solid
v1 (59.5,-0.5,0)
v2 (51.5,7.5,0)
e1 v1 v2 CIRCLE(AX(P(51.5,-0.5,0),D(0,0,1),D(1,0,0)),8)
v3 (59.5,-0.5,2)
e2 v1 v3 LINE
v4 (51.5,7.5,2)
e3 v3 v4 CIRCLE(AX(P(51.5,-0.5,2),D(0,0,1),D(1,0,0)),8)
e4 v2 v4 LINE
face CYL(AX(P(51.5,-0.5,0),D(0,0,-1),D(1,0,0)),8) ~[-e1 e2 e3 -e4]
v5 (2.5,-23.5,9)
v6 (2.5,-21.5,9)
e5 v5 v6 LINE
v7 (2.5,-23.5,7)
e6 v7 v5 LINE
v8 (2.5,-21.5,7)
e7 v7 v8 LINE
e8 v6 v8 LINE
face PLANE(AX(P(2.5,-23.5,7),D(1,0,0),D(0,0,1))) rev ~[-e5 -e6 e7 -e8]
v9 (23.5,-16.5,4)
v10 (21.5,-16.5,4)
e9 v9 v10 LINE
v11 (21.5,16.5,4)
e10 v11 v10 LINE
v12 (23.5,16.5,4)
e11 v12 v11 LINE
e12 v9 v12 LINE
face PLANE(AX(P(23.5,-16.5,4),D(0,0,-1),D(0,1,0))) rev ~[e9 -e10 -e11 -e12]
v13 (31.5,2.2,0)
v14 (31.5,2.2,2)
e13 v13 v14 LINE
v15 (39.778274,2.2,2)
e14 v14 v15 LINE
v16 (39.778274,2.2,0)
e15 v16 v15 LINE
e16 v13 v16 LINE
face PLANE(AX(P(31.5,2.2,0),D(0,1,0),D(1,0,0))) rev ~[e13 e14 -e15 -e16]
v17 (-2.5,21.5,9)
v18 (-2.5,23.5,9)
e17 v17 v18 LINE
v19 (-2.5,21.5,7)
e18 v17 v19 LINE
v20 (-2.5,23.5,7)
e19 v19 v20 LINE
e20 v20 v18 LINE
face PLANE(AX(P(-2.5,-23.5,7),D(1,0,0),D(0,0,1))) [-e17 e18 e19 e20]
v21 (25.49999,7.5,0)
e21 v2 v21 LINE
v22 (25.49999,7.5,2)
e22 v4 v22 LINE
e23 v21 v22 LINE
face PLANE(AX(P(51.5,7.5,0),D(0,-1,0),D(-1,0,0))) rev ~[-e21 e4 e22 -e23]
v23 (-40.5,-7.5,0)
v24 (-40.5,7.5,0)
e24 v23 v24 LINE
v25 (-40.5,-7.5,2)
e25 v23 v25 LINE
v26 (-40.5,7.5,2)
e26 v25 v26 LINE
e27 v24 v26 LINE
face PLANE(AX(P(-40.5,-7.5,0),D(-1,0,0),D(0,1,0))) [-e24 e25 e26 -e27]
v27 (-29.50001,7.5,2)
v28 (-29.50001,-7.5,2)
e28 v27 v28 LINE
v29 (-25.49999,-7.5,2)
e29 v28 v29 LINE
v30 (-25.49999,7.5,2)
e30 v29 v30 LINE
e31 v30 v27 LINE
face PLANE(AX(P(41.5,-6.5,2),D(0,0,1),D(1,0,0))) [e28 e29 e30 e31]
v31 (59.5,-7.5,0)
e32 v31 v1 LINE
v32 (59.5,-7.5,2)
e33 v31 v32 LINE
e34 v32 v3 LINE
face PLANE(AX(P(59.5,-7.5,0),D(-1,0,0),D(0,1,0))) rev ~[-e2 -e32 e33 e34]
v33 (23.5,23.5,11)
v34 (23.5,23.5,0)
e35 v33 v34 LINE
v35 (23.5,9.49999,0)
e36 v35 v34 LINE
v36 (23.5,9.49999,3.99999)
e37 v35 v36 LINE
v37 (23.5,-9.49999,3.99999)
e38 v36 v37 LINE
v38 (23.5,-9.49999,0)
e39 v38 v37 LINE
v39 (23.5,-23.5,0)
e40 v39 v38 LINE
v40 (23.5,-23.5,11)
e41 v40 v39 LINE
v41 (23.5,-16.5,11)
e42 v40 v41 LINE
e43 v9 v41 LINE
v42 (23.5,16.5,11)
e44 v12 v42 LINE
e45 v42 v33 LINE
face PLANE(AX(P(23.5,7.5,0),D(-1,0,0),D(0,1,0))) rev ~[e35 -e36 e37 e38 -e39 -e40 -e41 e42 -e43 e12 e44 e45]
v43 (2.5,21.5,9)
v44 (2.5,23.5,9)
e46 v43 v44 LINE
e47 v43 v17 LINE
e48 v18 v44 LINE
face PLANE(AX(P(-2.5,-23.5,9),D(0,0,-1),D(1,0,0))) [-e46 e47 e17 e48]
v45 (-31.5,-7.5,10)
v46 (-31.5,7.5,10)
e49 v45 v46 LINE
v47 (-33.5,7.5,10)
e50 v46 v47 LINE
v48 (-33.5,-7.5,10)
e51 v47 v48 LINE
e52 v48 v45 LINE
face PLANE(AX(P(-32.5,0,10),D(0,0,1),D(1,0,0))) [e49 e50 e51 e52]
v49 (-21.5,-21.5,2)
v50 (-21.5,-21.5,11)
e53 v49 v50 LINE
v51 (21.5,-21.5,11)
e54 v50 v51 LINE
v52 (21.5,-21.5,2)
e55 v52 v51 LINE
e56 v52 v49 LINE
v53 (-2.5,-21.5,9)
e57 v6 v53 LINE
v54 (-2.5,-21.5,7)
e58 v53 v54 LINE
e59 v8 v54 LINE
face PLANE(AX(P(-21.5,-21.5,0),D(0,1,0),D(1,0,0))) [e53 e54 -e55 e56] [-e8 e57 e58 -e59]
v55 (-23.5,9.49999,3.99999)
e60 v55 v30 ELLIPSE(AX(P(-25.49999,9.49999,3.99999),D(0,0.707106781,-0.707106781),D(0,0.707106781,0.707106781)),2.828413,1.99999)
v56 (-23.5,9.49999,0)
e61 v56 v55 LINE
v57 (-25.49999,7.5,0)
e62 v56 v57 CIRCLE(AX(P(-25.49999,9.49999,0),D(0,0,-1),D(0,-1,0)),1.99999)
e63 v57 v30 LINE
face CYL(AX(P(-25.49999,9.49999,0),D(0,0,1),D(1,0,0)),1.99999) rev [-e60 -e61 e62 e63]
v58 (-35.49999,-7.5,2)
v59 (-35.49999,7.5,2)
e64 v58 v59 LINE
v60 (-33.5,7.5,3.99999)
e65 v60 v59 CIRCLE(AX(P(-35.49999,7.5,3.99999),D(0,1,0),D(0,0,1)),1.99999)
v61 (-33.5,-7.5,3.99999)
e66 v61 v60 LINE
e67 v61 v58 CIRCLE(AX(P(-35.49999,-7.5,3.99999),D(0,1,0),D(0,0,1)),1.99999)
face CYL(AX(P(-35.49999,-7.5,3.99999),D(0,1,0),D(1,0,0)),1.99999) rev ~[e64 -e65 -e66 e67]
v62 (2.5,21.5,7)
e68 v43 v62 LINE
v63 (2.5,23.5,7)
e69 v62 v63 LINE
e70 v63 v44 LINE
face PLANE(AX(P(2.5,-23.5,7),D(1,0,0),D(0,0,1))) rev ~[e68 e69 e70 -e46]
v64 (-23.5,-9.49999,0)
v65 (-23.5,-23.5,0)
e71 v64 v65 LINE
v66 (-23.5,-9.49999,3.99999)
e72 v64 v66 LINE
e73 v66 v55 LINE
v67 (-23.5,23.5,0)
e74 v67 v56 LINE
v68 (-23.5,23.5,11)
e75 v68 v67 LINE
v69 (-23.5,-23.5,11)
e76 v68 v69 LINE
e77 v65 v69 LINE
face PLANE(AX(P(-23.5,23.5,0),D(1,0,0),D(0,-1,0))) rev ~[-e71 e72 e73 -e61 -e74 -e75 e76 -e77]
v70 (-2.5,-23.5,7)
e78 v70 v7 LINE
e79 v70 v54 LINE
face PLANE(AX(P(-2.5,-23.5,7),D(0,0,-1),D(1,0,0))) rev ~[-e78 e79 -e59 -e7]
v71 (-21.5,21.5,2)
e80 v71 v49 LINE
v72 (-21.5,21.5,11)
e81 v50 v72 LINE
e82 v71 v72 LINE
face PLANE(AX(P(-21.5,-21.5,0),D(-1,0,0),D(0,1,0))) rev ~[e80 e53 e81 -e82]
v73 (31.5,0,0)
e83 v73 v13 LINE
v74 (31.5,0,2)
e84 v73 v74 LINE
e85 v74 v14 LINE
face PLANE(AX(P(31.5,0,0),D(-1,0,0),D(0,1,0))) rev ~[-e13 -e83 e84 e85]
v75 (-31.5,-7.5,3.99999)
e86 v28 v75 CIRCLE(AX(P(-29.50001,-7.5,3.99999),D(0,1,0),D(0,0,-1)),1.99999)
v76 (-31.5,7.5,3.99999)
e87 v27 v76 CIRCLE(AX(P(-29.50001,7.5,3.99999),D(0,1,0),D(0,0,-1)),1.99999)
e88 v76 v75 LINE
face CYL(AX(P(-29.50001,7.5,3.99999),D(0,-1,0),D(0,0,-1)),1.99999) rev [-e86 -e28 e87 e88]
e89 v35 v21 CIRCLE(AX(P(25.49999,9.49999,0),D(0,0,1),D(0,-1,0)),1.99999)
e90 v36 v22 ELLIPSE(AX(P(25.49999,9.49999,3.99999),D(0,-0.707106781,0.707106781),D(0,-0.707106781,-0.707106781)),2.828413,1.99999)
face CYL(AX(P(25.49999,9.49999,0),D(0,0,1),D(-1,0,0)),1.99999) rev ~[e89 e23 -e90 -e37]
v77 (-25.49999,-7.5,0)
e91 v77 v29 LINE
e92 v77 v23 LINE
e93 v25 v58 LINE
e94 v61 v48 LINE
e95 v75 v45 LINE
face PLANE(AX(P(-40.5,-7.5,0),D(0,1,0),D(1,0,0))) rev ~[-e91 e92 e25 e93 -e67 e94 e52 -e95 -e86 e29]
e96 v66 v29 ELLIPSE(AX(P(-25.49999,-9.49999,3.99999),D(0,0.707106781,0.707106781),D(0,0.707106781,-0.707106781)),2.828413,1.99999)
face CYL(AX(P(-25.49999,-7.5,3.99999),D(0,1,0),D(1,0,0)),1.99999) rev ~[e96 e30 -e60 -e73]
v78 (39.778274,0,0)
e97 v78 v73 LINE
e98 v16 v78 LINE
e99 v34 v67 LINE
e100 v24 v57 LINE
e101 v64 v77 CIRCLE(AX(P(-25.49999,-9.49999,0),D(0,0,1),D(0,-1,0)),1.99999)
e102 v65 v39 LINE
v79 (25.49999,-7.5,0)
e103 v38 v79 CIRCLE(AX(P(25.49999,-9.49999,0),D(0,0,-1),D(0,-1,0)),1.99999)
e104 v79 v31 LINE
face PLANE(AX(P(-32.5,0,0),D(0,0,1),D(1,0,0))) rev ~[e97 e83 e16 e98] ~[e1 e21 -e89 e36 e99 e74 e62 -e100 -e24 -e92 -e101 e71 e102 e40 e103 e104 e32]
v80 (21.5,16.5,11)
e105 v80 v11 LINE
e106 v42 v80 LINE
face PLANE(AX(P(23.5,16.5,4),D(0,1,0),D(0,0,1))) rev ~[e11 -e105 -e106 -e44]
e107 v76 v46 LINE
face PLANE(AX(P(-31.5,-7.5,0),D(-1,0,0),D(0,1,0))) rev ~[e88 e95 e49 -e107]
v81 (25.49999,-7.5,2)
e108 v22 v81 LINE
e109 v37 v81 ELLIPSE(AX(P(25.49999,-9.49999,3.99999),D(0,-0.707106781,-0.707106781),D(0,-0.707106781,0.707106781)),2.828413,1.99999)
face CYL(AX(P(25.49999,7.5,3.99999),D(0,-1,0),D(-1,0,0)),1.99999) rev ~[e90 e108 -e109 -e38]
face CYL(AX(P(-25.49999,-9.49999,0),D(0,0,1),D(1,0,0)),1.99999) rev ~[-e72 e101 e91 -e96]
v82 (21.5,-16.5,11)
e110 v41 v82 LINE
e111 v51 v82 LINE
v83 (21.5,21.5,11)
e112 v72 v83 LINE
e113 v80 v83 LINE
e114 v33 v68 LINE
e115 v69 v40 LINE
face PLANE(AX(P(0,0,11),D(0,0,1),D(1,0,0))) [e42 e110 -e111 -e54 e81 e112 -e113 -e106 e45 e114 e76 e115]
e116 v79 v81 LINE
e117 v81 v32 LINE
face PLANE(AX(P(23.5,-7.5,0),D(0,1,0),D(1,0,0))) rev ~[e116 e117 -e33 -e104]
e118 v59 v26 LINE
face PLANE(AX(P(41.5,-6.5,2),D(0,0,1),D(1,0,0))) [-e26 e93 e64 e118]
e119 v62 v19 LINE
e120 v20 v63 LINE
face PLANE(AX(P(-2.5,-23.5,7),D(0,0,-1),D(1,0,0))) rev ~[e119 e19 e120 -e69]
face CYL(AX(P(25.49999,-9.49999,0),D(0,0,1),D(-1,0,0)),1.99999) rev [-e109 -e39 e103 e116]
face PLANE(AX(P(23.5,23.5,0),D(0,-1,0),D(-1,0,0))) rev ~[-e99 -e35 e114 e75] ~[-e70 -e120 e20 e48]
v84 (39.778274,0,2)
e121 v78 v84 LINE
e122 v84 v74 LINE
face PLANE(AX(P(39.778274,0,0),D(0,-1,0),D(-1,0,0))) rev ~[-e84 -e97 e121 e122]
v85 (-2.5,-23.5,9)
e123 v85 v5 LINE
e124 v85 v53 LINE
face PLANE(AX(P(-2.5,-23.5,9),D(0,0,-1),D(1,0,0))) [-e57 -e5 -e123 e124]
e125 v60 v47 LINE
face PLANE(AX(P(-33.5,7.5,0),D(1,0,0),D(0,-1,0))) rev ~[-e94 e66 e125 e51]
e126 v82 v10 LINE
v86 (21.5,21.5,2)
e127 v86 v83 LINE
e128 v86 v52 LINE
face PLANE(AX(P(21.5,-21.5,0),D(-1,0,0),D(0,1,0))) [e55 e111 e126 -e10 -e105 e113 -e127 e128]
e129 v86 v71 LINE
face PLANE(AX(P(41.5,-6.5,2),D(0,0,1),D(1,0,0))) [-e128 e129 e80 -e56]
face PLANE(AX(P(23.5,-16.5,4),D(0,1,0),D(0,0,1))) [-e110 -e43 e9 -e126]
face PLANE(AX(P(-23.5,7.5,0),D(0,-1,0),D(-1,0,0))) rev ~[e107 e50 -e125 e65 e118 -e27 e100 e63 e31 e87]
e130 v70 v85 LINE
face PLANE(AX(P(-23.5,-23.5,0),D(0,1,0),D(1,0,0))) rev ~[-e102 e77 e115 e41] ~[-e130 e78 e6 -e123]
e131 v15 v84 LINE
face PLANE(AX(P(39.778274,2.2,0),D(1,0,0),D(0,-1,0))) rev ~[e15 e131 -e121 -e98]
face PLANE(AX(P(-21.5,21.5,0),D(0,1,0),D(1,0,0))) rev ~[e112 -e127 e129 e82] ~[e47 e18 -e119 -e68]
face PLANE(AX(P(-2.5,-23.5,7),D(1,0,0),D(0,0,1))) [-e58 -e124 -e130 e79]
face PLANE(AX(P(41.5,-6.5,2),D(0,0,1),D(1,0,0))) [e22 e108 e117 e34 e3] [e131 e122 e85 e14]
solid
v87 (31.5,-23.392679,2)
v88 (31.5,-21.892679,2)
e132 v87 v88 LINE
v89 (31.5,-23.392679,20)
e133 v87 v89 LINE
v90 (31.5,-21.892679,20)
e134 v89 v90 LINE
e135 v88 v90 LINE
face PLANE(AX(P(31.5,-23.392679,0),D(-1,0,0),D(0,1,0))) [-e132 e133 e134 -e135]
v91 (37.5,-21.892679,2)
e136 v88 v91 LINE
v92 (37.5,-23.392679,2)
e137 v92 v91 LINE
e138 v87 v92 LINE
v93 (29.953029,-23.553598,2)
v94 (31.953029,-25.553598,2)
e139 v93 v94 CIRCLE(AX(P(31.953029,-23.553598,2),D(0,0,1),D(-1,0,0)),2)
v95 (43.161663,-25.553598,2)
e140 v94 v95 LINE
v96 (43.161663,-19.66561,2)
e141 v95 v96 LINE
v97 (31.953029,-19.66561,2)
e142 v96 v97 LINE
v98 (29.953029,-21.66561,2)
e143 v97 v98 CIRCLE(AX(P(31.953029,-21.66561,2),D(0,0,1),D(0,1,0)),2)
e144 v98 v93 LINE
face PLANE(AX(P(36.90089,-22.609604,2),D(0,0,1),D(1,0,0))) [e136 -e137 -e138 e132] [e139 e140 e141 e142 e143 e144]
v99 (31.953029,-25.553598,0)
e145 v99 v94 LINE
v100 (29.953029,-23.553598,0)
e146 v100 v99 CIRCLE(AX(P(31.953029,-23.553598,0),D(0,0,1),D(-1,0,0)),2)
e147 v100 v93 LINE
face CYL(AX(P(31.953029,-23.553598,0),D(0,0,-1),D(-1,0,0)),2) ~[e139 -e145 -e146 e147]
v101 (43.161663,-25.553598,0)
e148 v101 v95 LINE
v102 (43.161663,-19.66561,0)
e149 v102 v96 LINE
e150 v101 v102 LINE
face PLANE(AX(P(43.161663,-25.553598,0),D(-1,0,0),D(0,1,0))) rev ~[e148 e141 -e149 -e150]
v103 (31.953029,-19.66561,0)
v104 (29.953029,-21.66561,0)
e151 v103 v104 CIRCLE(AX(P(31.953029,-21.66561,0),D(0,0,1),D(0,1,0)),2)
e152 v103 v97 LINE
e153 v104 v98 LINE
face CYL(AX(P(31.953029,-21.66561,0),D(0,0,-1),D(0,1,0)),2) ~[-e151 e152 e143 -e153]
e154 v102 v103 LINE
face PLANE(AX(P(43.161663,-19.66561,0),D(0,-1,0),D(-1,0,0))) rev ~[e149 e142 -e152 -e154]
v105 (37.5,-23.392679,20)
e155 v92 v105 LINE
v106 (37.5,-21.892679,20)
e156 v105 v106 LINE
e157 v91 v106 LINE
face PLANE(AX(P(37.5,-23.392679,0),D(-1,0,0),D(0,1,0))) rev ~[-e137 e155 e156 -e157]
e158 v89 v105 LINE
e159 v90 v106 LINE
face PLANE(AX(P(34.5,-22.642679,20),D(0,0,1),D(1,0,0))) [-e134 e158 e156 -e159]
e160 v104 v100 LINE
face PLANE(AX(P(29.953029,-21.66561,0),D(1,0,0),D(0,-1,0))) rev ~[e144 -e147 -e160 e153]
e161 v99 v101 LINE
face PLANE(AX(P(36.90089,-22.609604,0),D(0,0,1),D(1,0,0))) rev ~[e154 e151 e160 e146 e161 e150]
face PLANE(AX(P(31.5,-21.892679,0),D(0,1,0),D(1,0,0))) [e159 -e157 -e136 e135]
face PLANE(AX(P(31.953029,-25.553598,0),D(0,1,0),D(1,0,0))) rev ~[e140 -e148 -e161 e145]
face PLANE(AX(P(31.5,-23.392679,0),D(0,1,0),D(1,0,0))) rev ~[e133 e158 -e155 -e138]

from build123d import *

# Parameters (mm, degrees)
F0_W      = 43
F0_H      = 43
F0_W_2    = 8
F0_H_2    = 13
F0_H_3    = 2
F0_W_3    = 7
F0_H_4    = 15
F1_DEPTH  = 2
F2_DEPTH  = 10
F3_DEPTH  = 11
F4_W      = 33
F4_H      = 7
F5_DEPTH  = 25
F6_R      = 1.99999
F7_DEPTH  = 25
F8_W      = 5
F8_H      = 2
F9_DEPTH  = 47.001
F10_W     = 6
F10_H     = 1.5
F11_DEPTH = 20
F12_DEPTH = 2


# Not quite as in the source:
# - a fillet or chamfer is up to 0.001 mm smaller than in the source, because OpenCascade refuses the exact size


with BuildPart() as f1:
    # F0 (on Top) → F1 (new body)
    with BuildSketch(Plane.XY):
        Polygon((23.5, -7.5), (40.5, -7.5), (59.5, -7.5), (59.5, -5.5), (36.5, -5.5), (23.5, -5.5), align=None)
        Polygon((23.5, -23.5), (23.5, -7.5), (23.5, -5.5), (23.5, 7.5), (23.5, 23.5), (-23.5, 23.5), (-23.5, 7.5), (-23.5, 5.5), (-23.5, -7.5), (-23.5, -23.5), align=None)
        Rectangle(F0_W, F0_H, mode=Mode.SUBTRACT)
        Polygon((23.5, 7.5), (23.5, -5.5), (36.5, -5.5), (36.5, 0), (31.5, 0), (31.5, 2.2), (36.5, 2.2), (36.5, 7.5), align=None)
        with BuildLine():
            Line((36.5, -5.5), (59.5, -5.5))
            Line((59.5, -5.5), (59.5, -0.5))
            ThreePointArc((59.5, -0.5), (57.1568542495, 5.1568542495), (51.5, 7.5))
            Line((51.5, 7.5), (40.5, 7.5))
            Line((40.5, 7.5), (36.5, 7.5))
            Line((36.5, 7.5), (36.5, 2.2))
            Line((36.5, 2.2), (39.7782735527, 2.2))
            Line((39.7782735527, 2.2), (39.7782735527, 0))
            Line((39.7782735527, 0), (36.5, 0))
            Line((36.5, 0), (36.5, -5.5))
        make_face()
        with Locations((-27.5, -1)):
            Rectangle(F0_W_2, F0_H_2)
        Polygon((-33.5, -7.5), (-31.5, -7.5), (-31.5, 5.5), (-31.5, 7.5), (-33.5, 7.5), align=None)
        with Locations((-27.5, 6.5)):
            Rectangle(F0_W_2, F0_H_3)
        with Locations((-37, 0)):
            Rectangle(F0_W_3, F0_H_4)
        Rectangle(F0_W, F0_H)
    extrude(amount=F1_DEPTH)

    # F0 (on Top) → F2 (join)
    with BuildSketch(Plane.XY):
        Polygon((-33.5, -7.5), (-31.5, -7.5), (-31.5, 5.5), (-31.5, 7.5), (-33.5, 7.5), align=None)
    extrude(amount=F2_DEPTH)

    # F0 (on Top) → F3 (join)
    with BuildSketch(Plane.XY):
        Polygon((23.5, -23.5), (23.5, -7.5), (23.5, -5.5), (23.5, 7.5), (23.5, 23.5), (-23.5, 23.5), (-23.5, 7.5), (-23.5, 5.5), (-23.5, -7.5), (-23.5, -23.5), align=None)
        Rectangle(F0_W, F0_H, mode=Mode.SUBTRACT)
    extrude(amount=F3_DEPTH)

    # F4 (on face) → F5 (cut)
    with BuildSketch(Plane.YZ.offset(23.5)):
        with Locations((0, 7.5)):
            Rectangle(F4_W, F4_H)
    extrude(amount=-F5_DEPTH, mode=Mode.SUBTRACT)

    # F6 (radius 2 in the source; OpenCascade refuses exactly that, so slightly less here)
    f6_edges = [f1.edges().sort_by_distance(p)[0] for p in [
        (-23.5, 0, 2),
        (-31.5, 0, 2),
        (23.5, 0, 2),
        (-33.5, 0, 2),
        (23.5, 7.5, 1),
        (-23.5, -7.5, 1),
        (23.5, -7.5, 1),
        (-23.5, 7.5, 1),
    ]]
    fillet(f6_edges, radius=F6_R)

    # F0 (on Top) → F7 (cut)
    with BuildSketch(Plane.XY):
        Polygon((31.5, 0), (36.5, 0), (39.7782735527, 0), (39.7782735527, 2.2), (36.5, 2.2), (31.5, 2.2), align=None)
    extrude(amount=-F7_DEPTH, mode=Mode.SUBTRACT)

    # F8 (on face) → F9 (cut, through all)
    with BuildSketch(Plane.XZ.offset(23.5)):
        with Locations((0, 8)):
            Rectangle(F8_W, F8_H)
    extrude(amount=-F9_DEPTH, mode=Mode.SUBTRACT)


with BuildPart() as f11:
    # F10 (on Top) → F11 (new body)
    with BuildSketch(Plane.XY):
        with Locations((34.5, -22.6426791698)):
            Rectangle(F10_W, F10_H)
    extrude(amount=F11_DEPTH)

    # F10 (on Top) → F12 (join)
    with BuildSketch(Plane.XY):
        with BuildLine():
            Line((43.161662899, -19.6656095535), (31.9530290067, -19.6656095535))
            ThreePointArc((31.9530290067, -19.6656095535), (30.5388154443, -20.2513959911), (29.9530290067, -21.6656095535))
            Line((29.9530290067, -21.6656095535), (29.9530290067, -23.5535977408))
            ThreePointArc((29.9530290067, -23.5535977408), (30.5388154443, -24.9678113032), (31.9530290067, -25.5535977408))
            Line((31.9530290067, -25.5535977408), (43.161662899, -25.5535977408))
            Line((43.161662899, -25.5535977408), (43.161662899, -19.6656095535))
        make_face()
        with Locations((34.5, -22.6426791698)):
            Rectangle(F10_W, F10_H, mode=Mode.SUBTRACT)
    extrude(amount=F12_DEPTH)


solid = Compound([f1.part, f11.part])
